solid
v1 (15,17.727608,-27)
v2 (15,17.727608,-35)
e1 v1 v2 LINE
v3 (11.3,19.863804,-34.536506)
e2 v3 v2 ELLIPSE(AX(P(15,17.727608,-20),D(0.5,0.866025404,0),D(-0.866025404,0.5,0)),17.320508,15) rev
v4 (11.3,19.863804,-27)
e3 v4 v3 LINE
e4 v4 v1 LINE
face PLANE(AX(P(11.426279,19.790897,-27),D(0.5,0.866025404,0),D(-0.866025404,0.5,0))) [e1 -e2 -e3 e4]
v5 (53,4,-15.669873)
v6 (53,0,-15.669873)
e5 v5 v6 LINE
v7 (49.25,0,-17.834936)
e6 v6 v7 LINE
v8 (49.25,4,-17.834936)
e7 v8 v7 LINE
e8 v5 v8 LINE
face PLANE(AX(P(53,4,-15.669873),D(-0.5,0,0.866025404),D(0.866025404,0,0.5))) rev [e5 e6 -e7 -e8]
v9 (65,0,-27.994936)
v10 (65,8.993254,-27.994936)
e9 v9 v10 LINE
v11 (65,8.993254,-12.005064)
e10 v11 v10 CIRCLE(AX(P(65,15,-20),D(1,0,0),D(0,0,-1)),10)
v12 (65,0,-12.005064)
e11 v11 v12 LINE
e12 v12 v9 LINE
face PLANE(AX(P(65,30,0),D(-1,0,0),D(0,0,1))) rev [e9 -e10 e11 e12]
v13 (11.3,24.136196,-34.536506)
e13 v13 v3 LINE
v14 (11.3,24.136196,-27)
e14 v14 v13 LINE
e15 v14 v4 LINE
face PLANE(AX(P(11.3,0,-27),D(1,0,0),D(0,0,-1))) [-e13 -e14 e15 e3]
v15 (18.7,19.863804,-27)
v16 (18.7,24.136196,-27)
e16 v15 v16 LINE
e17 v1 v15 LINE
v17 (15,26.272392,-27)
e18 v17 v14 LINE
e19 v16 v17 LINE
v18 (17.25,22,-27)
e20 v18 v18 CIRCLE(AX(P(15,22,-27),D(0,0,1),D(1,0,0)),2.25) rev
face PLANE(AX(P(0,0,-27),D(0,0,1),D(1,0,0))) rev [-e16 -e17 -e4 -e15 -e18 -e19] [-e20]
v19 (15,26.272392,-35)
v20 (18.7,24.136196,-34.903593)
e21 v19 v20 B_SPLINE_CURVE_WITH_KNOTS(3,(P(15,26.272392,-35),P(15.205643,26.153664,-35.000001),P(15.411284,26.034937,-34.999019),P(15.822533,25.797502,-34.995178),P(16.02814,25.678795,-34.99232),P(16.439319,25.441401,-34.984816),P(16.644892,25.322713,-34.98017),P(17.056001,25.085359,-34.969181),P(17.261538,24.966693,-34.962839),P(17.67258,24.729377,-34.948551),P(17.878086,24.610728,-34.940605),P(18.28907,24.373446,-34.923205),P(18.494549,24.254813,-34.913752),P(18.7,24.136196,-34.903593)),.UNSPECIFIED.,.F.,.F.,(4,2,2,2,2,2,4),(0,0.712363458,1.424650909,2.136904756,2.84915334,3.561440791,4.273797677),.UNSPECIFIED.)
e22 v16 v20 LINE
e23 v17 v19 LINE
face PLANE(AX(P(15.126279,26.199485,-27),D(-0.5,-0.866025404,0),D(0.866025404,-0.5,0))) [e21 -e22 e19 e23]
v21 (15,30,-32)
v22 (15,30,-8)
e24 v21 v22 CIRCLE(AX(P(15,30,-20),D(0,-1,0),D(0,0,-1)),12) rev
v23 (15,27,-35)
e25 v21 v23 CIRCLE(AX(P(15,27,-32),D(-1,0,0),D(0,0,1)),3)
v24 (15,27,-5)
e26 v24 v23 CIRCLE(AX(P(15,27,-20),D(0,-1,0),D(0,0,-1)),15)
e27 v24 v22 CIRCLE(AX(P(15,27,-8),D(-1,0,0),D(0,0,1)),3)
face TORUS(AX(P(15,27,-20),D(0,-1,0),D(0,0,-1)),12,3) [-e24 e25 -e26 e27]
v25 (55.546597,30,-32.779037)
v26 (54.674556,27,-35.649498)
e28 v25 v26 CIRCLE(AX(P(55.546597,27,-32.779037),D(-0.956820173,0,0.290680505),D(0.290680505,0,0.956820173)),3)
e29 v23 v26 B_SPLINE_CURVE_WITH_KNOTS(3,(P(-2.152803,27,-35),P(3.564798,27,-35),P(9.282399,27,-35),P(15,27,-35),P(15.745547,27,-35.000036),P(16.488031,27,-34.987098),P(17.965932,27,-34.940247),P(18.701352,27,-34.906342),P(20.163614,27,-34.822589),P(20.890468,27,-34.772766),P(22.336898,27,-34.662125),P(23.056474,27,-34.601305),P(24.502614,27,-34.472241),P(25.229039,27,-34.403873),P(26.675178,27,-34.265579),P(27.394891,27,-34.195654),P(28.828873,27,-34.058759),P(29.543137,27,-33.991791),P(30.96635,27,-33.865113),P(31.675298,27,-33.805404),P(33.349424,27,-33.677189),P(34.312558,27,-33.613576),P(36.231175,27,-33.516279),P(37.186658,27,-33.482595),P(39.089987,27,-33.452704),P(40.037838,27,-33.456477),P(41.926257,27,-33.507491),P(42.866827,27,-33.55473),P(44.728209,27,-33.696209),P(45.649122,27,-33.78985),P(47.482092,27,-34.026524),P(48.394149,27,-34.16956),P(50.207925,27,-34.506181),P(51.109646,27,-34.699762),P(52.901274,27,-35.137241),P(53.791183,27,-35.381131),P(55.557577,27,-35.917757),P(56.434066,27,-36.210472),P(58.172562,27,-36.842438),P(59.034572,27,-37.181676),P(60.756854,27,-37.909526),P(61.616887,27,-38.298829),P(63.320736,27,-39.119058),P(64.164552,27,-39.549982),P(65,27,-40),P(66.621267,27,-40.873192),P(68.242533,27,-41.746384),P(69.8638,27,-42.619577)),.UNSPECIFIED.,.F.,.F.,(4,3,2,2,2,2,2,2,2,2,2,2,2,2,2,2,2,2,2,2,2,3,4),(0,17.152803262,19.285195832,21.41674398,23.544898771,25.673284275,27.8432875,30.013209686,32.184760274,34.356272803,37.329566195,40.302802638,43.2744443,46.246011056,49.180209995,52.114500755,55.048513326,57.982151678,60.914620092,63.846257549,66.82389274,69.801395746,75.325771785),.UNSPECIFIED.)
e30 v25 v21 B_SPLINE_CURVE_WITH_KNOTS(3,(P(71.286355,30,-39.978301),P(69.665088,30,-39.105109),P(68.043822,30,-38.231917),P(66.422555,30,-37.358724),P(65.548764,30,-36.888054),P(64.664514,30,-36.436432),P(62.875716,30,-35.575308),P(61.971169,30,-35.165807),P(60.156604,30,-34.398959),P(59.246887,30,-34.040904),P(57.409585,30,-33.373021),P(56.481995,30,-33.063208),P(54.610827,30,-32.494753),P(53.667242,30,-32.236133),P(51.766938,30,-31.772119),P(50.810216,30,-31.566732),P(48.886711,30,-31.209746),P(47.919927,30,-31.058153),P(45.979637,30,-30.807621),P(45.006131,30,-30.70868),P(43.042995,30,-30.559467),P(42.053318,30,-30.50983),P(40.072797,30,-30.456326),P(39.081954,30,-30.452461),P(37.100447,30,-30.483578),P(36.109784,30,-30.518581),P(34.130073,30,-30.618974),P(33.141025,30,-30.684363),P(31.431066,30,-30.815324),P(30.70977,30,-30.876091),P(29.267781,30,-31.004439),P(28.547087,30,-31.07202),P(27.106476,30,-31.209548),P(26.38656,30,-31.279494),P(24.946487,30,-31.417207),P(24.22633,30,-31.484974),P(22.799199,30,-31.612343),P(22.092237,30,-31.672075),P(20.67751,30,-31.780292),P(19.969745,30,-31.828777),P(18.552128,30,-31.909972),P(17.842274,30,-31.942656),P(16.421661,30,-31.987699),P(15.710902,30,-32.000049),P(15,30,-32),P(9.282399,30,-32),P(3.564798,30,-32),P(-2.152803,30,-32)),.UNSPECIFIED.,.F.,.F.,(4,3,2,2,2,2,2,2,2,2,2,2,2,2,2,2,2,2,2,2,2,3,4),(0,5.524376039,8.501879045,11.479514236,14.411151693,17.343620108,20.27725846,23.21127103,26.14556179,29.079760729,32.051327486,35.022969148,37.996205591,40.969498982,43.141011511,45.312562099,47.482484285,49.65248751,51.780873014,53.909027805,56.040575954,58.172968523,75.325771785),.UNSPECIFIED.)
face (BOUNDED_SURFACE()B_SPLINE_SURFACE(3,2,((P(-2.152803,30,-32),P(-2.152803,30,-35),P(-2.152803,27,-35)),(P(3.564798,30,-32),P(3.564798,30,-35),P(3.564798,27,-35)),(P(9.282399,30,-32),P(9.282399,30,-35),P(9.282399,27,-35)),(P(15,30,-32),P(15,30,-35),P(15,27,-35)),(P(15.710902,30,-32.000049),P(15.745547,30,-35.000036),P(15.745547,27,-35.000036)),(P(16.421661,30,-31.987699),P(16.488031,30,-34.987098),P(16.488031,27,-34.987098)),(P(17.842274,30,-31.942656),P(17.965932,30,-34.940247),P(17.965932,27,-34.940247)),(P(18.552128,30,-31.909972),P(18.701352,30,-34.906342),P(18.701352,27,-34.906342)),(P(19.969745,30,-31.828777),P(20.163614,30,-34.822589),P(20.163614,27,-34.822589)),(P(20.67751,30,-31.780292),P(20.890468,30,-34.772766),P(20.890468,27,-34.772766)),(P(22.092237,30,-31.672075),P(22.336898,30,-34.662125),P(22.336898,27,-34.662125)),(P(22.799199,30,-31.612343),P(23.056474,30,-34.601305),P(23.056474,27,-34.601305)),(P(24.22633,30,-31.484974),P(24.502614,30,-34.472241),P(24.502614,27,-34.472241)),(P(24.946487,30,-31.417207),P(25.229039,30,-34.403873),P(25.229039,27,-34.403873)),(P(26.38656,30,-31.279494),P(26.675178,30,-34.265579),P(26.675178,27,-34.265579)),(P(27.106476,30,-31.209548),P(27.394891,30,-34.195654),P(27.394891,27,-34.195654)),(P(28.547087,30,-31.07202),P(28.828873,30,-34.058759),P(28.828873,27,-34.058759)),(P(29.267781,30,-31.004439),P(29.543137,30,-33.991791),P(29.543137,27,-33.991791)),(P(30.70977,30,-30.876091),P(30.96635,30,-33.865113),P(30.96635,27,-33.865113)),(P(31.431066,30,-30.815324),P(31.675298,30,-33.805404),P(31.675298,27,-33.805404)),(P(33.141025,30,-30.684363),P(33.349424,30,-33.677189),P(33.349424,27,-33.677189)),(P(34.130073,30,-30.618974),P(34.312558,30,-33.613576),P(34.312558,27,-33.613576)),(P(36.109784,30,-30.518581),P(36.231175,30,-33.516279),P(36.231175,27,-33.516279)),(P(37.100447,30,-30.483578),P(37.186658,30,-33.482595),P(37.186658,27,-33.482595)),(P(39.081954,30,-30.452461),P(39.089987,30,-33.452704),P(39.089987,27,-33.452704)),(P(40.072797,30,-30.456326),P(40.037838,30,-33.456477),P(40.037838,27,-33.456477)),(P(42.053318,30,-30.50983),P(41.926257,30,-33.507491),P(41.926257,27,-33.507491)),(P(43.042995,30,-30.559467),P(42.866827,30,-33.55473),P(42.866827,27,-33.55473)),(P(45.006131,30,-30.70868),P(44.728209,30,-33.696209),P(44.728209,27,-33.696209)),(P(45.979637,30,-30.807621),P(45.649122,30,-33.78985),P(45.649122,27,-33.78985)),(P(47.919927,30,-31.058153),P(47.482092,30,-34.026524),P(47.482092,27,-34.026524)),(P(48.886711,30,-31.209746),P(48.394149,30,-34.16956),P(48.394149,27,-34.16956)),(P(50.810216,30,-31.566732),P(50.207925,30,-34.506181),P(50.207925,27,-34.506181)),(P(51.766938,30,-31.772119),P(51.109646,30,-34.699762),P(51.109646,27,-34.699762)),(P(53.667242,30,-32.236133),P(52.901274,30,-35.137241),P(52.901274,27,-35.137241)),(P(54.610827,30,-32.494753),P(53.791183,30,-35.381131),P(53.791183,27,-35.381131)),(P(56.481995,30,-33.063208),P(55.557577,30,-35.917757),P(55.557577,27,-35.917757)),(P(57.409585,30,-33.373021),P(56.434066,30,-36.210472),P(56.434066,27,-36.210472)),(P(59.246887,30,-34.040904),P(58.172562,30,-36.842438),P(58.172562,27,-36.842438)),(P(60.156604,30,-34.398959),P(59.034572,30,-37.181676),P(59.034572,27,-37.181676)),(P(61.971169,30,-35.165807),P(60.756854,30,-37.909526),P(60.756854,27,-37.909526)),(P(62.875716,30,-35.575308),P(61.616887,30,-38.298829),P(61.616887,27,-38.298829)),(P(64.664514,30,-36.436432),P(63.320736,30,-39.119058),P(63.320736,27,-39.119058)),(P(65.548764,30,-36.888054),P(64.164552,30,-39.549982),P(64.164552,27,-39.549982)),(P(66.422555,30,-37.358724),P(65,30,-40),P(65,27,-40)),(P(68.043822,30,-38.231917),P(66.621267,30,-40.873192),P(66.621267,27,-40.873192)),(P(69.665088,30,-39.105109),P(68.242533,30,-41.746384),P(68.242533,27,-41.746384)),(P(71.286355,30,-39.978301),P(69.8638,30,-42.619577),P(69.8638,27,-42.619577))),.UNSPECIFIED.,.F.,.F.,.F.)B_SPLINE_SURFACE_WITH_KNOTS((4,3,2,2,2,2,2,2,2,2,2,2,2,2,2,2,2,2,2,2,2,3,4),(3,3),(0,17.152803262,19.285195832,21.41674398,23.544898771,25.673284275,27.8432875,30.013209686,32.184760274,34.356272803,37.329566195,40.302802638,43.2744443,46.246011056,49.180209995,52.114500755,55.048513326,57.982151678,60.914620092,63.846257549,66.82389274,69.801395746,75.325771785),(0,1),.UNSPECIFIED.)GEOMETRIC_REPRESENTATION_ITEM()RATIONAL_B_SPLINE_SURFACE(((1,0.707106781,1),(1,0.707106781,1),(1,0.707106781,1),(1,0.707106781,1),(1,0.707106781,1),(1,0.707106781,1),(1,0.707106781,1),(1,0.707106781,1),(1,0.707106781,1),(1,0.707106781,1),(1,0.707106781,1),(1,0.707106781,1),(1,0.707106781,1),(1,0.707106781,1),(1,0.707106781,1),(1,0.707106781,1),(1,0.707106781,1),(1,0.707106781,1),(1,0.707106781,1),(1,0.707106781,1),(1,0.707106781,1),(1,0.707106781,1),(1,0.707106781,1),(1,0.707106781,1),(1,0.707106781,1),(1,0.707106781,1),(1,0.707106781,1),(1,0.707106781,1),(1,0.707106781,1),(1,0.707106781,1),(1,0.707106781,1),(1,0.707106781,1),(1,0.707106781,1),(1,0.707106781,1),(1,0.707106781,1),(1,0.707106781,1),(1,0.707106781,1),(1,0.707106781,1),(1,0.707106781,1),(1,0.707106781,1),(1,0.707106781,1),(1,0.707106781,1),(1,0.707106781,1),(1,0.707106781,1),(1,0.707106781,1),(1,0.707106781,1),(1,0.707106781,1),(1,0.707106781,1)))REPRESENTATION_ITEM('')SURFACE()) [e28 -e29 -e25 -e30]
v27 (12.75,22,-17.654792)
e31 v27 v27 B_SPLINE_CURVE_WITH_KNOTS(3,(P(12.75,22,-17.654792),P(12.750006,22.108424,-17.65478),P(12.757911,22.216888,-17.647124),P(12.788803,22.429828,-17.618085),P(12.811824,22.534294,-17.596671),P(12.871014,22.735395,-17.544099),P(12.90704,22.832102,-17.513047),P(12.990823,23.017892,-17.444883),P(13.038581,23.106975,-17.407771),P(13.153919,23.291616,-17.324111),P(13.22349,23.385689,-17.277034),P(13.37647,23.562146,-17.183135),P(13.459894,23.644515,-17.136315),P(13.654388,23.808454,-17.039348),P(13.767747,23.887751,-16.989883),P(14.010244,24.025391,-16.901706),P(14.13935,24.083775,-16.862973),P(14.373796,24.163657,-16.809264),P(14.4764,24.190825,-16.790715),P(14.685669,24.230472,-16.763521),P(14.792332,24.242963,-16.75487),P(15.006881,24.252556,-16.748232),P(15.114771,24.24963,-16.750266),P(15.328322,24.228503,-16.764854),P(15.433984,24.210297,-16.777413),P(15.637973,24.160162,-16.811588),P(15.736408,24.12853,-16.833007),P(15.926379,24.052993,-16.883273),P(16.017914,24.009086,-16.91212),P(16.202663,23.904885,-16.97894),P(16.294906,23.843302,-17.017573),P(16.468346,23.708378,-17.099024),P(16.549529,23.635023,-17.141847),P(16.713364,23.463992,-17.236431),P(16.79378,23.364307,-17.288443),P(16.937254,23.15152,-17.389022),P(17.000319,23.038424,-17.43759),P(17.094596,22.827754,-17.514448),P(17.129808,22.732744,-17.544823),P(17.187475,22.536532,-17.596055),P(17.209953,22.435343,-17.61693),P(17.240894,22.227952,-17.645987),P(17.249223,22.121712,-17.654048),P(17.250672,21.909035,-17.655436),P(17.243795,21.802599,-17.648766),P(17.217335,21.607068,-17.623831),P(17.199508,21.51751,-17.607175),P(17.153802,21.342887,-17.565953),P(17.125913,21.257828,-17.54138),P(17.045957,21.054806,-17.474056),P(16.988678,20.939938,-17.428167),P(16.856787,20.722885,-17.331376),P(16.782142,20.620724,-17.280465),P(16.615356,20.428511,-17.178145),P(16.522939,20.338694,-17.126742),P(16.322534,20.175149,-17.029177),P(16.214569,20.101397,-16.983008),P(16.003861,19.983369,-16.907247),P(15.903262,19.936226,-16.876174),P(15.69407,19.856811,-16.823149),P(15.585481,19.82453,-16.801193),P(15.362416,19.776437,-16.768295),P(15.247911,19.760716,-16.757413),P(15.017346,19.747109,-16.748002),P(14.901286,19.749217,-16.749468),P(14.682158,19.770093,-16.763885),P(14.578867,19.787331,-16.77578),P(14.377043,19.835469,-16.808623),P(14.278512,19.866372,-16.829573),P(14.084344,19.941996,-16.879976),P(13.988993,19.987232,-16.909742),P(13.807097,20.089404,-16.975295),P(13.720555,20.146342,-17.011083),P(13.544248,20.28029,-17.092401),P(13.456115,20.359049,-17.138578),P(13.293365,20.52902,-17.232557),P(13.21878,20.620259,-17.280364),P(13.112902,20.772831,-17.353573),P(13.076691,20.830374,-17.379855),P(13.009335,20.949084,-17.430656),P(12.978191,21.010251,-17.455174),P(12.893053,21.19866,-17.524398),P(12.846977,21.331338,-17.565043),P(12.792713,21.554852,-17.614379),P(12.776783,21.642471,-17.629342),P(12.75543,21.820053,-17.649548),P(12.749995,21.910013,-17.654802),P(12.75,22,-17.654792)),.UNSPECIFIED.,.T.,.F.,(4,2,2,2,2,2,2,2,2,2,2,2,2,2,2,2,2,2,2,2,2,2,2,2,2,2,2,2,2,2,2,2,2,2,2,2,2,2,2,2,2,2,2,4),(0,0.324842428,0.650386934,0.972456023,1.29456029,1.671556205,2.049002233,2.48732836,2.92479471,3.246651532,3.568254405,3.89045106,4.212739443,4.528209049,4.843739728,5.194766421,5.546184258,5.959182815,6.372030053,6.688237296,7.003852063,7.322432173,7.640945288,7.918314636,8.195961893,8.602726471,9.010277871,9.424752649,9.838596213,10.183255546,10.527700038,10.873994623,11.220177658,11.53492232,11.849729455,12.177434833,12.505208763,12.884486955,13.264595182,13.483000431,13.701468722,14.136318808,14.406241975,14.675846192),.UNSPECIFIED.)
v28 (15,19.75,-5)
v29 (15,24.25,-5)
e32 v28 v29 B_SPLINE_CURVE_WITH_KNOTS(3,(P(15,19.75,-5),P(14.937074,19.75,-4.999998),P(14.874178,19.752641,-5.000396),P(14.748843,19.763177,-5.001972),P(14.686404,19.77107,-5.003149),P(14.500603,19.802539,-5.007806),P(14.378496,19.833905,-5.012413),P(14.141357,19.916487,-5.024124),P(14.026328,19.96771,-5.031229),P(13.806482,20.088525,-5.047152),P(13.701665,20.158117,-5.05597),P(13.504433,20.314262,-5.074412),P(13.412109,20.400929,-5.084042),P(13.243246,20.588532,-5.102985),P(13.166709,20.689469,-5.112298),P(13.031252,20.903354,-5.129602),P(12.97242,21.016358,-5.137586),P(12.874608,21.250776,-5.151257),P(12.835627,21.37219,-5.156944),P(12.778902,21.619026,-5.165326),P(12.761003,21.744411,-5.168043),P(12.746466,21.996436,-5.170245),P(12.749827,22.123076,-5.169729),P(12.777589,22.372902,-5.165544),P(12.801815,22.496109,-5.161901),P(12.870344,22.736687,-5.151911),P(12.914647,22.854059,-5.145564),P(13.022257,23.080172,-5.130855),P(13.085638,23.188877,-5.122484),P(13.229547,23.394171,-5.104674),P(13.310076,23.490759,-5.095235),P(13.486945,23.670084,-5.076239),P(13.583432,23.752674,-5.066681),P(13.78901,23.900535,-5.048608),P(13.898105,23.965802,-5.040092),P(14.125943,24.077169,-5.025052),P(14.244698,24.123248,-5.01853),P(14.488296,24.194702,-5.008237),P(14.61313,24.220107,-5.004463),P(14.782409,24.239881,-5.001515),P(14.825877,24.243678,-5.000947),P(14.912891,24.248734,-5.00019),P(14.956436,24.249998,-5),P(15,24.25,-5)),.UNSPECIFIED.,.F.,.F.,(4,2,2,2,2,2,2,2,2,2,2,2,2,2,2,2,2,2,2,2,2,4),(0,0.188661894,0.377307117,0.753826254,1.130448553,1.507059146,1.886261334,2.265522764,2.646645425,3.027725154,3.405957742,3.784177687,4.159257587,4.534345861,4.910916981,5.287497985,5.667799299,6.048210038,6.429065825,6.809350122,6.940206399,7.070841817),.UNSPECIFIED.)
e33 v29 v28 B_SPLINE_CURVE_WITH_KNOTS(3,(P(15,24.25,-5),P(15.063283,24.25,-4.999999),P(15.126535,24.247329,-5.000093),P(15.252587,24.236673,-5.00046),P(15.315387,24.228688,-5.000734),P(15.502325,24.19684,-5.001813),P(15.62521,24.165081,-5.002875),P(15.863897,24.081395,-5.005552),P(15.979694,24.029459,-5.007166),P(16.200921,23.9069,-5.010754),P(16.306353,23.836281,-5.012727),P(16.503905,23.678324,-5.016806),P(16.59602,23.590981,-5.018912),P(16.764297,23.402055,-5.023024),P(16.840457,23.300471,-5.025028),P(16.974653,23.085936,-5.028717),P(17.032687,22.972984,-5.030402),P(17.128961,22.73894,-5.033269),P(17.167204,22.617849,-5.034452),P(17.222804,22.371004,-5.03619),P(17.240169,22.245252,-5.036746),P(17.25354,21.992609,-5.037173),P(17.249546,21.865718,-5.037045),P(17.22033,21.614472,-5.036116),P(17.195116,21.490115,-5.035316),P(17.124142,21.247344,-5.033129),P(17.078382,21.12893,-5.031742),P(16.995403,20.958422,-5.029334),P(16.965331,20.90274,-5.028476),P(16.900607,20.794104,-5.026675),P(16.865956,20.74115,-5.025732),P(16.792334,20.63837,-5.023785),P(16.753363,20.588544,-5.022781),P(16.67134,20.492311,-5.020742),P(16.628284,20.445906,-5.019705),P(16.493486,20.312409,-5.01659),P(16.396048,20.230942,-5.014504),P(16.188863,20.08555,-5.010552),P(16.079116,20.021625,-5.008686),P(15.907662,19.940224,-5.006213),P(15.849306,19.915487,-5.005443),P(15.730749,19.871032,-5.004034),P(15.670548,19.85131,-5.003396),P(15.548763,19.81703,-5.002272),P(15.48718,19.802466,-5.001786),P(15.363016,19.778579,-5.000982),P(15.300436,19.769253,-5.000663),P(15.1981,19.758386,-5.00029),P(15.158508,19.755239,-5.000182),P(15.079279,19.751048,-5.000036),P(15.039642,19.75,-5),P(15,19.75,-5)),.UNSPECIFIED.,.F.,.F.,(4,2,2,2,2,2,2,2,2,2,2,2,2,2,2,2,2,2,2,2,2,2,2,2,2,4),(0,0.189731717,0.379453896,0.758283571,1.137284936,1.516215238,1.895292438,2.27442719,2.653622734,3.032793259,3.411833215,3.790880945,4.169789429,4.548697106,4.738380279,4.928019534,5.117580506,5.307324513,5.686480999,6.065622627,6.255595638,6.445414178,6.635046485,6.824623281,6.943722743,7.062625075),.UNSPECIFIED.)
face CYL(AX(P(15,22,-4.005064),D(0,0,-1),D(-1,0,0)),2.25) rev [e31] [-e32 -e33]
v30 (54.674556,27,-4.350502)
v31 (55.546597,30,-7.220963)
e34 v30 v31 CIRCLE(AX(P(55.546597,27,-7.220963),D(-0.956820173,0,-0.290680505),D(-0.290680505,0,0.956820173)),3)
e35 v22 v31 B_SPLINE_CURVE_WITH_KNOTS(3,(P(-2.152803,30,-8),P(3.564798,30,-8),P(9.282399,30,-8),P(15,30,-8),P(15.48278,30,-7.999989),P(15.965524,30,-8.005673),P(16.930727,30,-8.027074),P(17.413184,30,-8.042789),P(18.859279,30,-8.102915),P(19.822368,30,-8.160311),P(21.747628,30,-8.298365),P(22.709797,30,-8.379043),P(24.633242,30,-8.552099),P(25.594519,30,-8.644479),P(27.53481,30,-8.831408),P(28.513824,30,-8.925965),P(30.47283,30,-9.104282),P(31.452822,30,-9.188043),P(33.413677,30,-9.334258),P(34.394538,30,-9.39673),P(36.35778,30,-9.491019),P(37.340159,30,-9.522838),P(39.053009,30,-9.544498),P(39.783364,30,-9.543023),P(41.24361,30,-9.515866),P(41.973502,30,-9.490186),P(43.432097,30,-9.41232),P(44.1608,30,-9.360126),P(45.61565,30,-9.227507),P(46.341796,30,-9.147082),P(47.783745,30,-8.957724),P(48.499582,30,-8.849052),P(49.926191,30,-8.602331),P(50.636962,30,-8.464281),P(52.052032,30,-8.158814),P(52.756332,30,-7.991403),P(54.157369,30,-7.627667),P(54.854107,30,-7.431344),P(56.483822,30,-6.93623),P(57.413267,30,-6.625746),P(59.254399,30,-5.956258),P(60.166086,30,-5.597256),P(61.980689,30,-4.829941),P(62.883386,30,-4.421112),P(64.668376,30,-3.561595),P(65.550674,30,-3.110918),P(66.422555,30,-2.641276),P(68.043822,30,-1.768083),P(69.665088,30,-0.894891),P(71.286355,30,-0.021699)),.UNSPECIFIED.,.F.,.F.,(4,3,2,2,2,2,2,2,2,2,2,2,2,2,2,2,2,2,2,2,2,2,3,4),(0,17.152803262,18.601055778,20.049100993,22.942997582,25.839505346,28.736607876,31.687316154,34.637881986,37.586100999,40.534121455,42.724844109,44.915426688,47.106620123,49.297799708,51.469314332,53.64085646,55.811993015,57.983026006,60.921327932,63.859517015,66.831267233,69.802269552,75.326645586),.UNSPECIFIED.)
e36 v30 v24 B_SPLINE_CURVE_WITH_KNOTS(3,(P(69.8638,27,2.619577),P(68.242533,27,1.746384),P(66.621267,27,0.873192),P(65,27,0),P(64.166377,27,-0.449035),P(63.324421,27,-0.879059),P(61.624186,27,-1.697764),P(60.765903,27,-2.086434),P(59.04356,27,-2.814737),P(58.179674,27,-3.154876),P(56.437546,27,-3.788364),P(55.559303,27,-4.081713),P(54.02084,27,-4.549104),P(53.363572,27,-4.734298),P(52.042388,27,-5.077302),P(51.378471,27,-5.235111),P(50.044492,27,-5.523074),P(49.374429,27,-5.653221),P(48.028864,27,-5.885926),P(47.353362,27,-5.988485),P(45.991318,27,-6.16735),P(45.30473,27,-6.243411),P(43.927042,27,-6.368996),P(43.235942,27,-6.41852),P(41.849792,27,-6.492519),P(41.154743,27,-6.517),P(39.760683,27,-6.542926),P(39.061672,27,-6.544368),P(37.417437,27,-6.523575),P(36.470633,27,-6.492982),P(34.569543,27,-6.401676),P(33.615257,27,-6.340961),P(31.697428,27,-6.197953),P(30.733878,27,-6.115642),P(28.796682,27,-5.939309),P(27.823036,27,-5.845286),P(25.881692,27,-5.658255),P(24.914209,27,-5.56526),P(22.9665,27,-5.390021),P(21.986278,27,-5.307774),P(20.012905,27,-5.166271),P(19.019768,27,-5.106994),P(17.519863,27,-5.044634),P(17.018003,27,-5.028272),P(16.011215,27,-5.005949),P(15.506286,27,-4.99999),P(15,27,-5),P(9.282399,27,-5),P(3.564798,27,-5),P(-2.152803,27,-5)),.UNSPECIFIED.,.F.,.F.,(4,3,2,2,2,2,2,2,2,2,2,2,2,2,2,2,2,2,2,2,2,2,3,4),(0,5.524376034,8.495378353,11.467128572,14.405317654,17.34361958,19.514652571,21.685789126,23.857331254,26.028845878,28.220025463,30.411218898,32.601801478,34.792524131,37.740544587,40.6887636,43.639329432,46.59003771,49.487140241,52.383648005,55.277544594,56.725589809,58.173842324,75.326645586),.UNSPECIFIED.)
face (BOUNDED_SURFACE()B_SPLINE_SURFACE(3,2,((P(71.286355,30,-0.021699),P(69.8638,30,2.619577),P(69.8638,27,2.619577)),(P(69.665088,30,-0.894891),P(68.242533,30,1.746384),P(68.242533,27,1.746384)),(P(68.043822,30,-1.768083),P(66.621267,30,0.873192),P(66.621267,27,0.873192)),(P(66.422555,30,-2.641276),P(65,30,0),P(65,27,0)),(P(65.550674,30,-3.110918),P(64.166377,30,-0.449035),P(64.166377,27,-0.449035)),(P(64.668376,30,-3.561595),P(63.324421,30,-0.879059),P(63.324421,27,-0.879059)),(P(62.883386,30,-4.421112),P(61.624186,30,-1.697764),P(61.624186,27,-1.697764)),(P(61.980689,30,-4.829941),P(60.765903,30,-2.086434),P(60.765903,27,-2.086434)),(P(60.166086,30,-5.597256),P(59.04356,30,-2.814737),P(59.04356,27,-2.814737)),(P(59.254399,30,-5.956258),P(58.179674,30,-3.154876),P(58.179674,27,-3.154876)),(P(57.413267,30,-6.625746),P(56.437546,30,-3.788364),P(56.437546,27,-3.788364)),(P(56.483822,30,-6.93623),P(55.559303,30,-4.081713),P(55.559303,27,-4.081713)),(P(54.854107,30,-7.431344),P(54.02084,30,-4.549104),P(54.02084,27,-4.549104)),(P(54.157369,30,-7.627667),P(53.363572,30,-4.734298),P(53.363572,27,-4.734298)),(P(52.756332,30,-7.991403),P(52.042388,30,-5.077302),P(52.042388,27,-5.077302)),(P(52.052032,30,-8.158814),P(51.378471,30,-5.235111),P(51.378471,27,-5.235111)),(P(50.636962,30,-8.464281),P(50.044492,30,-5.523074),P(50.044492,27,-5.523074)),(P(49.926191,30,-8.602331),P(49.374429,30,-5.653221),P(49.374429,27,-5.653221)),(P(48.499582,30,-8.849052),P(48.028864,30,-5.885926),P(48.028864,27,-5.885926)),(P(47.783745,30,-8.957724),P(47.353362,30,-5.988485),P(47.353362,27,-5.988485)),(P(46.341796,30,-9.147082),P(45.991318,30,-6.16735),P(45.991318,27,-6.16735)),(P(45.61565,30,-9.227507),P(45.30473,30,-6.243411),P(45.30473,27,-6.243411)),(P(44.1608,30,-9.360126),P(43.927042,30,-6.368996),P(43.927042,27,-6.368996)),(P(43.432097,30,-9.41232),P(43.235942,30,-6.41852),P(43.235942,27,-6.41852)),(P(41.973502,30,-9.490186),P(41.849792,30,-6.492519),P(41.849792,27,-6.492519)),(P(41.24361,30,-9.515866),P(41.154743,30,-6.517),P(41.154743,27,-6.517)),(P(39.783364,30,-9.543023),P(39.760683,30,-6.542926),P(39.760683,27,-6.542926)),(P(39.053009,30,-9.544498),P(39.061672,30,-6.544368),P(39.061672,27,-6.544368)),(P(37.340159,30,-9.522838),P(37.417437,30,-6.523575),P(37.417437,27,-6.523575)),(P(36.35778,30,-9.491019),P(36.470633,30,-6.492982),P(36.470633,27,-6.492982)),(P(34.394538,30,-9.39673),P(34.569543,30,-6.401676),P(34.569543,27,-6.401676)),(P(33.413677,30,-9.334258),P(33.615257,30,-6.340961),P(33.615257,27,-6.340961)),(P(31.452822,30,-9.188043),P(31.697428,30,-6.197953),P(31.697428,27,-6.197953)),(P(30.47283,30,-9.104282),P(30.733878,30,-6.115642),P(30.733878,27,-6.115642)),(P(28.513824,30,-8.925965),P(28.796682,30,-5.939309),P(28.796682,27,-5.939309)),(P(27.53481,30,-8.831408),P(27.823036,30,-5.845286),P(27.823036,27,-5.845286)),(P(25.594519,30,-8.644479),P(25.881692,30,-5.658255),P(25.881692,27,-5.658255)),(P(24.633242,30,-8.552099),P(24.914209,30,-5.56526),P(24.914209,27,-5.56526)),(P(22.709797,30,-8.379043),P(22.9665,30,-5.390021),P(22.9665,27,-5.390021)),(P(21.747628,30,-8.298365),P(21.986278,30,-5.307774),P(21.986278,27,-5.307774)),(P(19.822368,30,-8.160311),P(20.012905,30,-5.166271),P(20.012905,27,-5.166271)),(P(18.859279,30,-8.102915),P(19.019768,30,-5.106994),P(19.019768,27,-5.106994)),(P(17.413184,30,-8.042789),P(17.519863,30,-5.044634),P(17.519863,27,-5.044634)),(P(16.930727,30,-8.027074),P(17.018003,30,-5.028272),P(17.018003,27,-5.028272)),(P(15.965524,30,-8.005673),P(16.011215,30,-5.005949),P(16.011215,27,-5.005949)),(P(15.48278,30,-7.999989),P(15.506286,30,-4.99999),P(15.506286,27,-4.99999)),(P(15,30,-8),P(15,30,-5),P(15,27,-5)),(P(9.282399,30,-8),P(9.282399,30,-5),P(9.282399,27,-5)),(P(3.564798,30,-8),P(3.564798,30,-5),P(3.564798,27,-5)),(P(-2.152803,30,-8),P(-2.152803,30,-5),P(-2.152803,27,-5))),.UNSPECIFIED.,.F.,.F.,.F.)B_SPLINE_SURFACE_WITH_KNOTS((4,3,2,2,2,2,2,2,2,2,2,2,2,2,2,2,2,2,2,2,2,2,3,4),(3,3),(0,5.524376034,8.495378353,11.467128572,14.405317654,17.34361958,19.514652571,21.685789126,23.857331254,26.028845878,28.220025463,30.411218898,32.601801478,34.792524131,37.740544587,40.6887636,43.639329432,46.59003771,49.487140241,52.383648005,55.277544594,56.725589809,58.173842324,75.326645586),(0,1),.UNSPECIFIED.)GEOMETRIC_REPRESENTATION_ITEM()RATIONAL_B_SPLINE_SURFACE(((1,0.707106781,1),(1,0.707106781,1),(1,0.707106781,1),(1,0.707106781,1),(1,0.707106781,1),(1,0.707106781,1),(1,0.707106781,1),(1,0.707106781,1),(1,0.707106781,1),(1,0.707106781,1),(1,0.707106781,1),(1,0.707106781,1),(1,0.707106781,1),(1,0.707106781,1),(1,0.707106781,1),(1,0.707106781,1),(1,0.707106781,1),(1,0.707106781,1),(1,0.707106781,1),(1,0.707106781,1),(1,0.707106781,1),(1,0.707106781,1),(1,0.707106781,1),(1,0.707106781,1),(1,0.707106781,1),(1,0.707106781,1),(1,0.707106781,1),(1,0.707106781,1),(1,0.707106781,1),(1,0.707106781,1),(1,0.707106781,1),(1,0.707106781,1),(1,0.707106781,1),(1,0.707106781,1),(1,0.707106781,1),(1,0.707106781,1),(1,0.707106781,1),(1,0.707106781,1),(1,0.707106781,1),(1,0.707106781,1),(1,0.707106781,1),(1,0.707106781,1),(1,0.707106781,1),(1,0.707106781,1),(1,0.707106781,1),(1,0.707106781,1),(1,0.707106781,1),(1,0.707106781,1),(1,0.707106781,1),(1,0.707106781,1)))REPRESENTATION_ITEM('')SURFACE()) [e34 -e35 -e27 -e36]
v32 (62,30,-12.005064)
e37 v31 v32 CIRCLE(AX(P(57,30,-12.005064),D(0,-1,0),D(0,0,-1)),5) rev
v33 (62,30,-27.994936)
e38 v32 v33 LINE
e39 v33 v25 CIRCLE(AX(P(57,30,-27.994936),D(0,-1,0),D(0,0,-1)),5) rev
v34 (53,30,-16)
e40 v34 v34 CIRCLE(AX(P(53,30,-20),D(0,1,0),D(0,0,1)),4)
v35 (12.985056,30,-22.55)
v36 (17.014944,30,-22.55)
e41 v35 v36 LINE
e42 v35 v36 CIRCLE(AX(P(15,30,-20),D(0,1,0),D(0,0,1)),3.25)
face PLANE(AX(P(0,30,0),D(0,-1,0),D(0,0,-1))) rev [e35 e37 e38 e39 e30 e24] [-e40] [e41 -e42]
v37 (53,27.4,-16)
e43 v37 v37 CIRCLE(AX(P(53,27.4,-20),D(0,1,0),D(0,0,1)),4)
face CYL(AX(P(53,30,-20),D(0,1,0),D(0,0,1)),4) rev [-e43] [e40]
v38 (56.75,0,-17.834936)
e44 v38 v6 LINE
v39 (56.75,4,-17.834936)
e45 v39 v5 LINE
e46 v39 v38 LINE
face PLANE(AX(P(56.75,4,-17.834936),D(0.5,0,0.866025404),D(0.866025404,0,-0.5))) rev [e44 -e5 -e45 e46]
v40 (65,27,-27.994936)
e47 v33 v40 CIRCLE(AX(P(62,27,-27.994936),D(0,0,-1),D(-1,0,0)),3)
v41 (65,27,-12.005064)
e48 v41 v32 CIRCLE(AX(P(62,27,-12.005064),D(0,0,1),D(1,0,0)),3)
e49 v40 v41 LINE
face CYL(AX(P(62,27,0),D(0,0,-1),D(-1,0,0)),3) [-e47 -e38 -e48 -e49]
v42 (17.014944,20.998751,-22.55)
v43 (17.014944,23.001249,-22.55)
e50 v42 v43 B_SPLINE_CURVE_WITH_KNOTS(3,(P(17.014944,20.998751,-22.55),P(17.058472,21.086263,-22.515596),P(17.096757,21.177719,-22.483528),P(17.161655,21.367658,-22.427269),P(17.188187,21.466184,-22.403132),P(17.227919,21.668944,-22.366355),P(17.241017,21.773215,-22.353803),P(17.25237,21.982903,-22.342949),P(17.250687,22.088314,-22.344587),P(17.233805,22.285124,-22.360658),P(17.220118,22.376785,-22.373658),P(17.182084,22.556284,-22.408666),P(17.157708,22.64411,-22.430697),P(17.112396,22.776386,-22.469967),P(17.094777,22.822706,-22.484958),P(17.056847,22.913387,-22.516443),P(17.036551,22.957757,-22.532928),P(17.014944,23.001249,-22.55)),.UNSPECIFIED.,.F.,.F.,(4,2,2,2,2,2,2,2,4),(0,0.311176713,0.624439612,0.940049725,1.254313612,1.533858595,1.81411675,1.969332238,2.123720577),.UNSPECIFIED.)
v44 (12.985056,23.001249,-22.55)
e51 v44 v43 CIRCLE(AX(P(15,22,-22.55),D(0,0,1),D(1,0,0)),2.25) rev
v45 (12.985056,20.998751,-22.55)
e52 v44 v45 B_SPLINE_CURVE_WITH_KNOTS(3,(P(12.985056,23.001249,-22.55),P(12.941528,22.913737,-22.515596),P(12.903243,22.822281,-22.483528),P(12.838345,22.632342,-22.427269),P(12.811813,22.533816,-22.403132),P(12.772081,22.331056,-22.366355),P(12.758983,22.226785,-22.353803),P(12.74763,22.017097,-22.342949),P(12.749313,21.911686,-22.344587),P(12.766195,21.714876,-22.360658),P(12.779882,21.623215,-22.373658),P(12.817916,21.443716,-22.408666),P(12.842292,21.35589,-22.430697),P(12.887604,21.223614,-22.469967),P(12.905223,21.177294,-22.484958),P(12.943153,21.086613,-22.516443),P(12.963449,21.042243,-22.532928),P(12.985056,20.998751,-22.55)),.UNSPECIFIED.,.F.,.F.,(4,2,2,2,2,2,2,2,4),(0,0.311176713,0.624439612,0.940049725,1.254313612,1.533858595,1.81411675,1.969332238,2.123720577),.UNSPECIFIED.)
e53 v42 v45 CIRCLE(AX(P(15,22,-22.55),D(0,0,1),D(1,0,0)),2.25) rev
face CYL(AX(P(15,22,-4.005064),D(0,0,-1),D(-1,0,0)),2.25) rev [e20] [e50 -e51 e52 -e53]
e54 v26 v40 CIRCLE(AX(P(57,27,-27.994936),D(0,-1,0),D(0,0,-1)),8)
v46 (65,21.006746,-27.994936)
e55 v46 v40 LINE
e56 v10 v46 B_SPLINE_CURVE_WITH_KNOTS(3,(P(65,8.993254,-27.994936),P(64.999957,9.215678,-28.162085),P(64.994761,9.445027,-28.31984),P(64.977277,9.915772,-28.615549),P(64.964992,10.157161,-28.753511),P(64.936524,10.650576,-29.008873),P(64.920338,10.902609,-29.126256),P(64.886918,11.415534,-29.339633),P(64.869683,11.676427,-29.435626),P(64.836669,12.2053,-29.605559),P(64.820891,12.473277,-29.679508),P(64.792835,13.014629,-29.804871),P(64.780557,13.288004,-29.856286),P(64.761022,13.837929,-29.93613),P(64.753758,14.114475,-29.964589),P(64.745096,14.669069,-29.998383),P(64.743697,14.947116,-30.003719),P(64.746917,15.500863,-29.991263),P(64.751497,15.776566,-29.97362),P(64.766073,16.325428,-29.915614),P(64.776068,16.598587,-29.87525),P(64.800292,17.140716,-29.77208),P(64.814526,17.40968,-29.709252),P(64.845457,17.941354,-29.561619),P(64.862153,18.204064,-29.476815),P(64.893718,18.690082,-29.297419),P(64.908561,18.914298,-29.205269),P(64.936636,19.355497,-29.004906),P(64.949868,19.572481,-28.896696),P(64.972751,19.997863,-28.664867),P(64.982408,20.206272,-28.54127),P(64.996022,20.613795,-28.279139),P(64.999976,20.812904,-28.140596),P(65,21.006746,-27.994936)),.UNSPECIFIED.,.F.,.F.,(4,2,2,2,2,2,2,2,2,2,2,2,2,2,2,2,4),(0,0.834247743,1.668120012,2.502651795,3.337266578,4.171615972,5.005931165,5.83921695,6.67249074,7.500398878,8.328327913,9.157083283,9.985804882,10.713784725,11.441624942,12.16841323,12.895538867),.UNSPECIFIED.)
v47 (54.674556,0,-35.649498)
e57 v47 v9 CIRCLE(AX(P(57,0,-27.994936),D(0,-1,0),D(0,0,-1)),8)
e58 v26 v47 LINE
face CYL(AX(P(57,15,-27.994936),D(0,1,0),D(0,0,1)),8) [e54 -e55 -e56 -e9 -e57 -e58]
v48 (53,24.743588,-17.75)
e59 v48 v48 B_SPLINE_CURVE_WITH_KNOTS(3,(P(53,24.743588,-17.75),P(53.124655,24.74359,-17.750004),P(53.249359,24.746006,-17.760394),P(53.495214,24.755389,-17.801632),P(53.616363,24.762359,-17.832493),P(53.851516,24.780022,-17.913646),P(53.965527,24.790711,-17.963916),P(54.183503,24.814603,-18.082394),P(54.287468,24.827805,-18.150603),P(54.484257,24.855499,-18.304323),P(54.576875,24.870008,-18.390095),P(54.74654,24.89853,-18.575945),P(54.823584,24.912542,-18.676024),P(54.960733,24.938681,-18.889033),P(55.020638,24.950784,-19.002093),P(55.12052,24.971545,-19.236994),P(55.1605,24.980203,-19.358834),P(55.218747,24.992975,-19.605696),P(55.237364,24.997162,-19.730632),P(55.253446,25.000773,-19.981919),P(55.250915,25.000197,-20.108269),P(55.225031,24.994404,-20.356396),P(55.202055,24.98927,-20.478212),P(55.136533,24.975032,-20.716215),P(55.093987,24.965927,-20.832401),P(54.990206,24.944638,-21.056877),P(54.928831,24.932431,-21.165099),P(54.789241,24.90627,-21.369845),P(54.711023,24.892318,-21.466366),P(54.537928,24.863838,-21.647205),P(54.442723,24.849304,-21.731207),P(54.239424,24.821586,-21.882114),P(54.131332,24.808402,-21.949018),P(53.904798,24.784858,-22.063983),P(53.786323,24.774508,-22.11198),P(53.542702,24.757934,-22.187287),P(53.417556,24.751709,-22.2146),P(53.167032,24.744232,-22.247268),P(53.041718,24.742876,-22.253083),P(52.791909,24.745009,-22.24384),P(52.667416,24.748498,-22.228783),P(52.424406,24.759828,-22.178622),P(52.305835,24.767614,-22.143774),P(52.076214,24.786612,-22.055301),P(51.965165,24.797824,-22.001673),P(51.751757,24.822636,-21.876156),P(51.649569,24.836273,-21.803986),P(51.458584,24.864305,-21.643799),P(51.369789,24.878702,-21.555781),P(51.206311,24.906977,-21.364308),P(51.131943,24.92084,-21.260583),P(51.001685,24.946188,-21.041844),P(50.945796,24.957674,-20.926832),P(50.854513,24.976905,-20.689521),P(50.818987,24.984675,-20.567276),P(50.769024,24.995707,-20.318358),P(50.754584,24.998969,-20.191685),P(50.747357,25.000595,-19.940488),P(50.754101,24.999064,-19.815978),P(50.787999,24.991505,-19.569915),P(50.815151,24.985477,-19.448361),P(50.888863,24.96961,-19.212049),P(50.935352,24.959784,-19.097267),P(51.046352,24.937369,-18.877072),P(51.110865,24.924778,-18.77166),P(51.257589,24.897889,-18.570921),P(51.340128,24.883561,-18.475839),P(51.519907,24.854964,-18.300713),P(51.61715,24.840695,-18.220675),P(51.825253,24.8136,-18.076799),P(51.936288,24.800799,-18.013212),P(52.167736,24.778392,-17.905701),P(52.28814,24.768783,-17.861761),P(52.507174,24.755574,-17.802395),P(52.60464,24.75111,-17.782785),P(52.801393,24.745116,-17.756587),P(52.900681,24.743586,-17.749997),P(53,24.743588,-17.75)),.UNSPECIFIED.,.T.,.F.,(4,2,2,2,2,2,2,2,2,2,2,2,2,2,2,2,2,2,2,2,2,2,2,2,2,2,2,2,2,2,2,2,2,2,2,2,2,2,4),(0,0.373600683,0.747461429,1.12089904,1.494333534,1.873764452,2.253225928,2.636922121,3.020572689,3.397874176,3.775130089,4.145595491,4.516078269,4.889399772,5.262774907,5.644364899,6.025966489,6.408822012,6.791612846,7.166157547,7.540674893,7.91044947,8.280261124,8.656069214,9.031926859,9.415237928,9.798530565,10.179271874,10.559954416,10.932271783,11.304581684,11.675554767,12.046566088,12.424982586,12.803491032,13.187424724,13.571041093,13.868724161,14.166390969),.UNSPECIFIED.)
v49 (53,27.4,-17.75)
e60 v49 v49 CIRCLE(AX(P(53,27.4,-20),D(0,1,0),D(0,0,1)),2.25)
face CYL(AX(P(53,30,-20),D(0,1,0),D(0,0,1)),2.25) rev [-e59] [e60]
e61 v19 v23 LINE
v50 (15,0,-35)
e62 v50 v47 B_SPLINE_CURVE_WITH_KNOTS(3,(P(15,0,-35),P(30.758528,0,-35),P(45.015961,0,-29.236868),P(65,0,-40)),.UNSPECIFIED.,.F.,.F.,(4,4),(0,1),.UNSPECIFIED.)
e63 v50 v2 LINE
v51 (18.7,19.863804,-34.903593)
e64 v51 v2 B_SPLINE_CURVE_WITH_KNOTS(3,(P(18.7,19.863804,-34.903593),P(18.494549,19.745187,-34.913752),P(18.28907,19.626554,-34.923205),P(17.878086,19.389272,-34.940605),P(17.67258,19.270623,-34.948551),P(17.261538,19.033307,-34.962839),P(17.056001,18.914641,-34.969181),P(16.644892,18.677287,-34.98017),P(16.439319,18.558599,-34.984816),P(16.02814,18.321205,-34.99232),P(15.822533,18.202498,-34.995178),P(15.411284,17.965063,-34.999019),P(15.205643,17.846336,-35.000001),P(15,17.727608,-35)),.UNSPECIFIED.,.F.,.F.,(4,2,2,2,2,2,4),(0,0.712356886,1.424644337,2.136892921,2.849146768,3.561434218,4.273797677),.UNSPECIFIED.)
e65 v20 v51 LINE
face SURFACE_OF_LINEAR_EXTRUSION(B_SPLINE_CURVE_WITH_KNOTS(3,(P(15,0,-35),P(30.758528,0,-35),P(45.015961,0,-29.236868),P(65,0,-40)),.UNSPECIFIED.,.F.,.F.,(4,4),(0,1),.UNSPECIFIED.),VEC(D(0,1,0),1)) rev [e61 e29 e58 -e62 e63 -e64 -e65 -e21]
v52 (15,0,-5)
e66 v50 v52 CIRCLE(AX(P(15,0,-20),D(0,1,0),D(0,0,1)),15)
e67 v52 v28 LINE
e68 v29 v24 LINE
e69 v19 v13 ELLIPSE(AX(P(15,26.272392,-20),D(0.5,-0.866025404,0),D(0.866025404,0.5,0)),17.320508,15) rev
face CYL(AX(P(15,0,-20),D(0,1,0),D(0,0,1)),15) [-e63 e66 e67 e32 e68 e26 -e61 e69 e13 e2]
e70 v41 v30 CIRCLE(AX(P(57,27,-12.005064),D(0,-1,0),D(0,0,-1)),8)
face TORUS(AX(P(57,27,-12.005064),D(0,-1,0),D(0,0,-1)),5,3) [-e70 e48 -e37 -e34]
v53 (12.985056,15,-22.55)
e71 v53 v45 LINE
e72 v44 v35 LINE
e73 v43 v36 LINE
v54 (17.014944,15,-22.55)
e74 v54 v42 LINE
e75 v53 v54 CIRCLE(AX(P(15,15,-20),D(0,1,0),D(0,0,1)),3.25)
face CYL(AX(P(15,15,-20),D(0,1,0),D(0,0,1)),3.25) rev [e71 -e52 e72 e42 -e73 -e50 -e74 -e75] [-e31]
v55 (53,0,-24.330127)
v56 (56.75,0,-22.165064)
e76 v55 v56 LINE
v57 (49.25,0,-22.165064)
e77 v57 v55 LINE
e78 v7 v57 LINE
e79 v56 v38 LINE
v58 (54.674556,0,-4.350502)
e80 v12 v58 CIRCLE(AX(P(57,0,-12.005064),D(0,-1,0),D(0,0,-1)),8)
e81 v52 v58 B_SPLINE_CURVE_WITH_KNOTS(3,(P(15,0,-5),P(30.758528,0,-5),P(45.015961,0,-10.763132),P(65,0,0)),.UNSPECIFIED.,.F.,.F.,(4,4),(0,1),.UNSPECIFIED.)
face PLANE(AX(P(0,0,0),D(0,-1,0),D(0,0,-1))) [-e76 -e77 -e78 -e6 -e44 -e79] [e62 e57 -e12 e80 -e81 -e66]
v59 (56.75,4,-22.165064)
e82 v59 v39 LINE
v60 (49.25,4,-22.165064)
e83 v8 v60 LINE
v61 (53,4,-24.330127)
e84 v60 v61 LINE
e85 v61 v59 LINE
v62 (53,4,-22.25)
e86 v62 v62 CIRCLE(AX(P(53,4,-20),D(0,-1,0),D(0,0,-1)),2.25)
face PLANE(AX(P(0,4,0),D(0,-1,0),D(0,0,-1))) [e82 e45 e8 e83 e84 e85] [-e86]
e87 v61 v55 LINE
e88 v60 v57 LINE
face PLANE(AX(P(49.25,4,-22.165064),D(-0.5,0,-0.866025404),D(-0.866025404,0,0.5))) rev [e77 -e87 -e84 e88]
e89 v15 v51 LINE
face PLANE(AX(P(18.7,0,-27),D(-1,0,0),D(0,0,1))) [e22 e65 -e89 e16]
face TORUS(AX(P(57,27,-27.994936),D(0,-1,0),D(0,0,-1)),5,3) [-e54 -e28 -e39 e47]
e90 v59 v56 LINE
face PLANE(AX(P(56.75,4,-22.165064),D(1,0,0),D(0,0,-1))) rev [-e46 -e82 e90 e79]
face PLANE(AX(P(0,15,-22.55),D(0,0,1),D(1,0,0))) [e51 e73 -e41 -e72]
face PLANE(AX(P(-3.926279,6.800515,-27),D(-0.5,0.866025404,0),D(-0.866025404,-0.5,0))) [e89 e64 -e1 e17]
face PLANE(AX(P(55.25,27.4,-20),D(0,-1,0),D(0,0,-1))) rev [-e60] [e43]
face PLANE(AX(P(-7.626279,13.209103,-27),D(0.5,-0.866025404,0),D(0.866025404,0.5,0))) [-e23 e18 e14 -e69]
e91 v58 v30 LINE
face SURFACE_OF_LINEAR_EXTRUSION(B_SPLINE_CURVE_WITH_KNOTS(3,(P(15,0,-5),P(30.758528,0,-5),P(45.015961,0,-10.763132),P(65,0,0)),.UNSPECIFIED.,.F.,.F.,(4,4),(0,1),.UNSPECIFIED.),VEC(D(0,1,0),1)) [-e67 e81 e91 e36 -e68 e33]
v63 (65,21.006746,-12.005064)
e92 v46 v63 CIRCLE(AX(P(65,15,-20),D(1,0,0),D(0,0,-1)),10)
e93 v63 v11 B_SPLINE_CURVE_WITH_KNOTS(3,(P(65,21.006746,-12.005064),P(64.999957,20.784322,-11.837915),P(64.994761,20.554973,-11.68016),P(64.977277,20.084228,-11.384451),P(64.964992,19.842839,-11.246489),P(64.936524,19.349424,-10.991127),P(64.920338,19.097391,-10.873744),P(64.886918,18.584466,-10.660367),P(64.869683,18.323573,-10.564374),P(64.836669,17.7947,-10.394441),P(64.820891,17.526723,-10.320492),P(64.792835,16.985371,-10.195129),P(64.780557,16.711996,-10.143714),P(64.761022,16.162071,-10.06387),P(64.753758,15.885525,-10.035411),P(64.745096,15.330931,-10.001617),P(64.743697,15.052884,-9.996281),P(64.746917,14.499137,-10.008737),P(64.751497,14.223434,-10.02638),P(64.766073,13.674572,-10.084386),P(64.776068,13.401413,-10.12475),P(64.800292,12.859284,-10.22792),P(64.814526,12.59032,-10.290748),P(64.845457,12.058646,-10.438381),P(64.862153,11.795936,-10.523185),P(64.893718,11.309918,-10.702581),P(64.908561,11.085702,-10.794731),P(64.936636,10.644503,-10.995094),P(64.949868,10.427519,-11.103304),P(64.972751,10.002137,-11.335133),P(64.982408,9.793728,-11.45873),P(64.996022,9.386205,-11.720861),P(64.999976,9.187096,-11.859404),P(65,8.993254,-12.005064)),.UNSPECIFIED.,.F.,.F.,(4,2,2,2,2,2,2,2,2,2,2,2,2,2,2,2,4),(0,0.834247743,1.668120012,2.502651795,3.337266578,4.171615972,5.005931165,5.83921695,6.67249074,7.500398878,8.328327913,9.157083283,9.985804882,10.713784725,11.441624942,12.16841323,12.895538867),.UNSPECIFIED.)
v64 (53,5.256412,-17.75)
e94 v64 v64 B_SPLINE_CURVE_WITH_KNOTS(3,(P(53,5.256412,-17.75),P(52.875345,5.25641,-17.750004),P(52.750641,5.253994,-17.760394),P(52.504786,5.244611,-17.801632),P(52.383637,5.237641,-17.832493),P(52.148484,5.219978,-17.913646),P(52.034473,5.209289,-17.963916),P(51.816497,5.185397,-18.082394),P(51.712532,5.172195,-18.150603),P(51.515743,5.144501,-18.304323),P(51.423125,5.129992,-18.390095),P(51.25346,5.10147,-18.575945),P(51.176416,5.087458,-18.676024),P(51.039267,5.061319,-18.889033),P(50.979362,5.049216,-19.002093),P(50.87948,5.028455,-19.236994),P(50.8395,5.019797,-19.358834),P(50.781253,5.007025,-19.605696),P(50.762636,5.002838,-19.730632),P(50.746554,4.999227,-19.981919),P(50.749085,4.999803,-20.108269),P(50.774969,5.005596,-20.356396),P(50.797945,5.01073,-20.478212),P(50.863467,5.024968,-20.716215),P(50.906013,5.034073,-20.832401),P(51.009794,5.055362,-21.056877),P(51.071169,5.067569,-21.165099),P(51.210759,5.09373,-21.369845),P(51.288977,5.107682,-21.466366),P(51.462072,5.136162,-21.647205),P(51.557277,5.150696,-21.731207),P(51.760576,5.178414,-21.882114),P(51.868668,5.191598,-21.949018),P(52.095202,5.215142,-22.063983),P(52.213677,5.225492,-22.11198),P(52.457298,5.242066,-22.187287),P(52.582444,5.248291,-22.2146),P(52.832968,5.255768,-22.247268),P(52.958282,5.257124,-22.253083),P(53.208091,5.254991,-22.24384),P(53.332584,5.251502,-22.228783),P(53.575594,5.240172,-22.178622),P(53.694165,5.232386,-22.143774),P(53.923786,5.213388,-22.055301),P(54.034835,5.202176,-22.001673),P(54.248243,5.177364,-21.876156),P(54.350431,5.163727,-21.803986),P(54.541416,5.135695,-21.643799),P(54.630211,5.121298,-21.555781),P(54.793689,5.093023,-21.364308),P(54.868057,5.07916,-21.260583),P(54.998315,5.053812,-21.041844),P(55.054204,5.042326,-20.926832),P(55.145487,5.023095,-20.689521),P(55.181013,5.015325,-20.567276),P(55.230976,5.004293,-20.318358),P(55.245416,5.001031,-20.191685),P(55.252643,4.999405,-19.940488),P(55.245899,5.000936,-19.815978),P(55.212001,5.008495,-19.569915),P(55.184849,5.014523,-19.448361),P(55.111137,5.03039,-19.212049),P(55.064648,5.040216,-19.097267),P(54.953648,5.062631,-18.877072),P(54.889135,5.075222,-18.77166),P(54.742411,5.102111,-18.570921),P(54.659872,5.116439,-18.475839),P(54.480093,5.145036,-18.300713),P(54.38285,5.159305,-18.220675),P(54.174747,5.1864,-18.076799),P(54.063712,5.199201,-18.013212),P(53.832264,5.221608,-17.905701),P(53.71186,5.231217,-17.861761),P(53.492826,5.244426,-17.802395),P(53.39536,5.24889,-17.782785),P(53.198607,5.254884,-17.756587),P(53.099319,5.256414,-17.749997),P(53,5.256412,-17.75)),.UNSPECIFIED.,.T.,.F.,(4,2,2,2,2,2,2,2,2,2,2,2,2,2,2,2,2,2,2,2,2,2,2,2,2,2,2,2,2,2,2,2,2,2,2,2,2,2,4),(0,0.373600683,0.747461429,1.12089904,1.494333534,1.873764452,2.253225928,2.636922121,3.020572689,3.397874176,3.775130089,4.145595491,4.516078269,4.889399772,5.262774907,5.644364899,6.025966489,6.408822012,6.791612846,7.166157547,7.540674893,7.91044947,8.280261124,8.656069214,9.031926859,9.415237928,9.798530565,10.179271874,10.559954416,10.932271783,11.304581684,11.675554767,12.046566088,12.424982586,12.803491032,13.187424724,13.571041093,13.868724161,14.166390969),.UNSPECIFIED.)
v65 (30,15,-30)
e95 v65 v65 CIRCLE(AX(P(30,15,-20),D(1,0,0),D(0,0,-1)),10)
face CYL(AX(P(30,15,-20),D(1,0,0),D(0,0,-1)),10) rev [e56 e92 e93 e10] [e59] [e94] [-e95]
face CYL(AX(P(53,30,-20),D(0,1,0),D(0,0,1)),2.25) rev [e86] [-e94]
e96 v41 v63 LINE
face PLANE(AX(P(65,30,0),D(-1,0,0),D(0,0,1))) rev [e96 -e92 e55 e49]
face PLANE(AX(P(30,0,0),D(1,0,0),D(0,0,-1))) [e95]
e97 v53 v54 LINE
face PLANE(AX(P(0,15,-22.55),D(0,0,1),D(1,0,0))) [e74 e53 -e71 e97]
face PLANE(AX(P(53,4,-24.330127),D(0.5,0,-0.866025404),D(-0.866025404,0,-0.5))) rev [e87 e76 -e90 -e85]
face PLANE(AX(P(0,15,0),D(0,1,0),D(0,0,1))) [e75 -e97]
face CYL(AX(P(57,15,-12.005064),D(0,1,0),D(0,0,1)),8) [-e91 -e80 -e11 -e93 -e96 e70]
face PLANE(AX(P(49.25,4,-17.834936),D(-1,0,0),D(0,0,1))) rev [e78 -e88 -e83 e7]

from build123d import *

# Parameters (mm, degrees)
SKETCH1_W                                   = 65
SKETCH1_H                                   = 40
BOSS_EXTRUDE1_DEPTH                         = 30
SKETCH3_R                                   = 10
CUT_EXTRUDE2_DEPTH                          = 35
CBORE_FOR_M4_CHEESE_HEAD_SCREW1_D           = 4.5
CBORE_FOR_M4_CHEESE_HEAD_SCREW1_CBORE_D     = 8
CBORE_FOR_M4_CHEESE_HEAD_SCREW1_CBORE_DEPTH = 2.6
SKETCH10_R                                  = 2.25
CUT_EXTRUDE8_DEPTH                          = 4
CUT_EXTRUDE9_DEPTH                          = 15
CUT_EXTRUDE10_DEPTH                         = 83.006097414
FILLET9_R                                   = 8
SKETCH12_R                                  = 2.25
CUT_EXTRUDE11_DEPTH                         = 8
SKETCH12_3_R                                = 2.25
CUT_EXTRUDE12_DEPTH                         = 79.010807554
FILLET10_R                                  = 3


with BuildPart() as part:
    # Sketch1 → Boss-Extrude1 (new body)
    with BuildSketch(Plane(origin=(0, 0, 0), x_dir=(1, 0, 0), z_dir=(0, 1, 0))):
        with Locations((32.5, 20)):
            Rectangle(SKETCH1_W, SKETCH1_H)
    extrude(amount=BOSS_EXTRUDE1_DEPTH)

    # Sketch3 → Cut-Extrude2 (cut)
    with BuildSketch(Plane(origin=(65, 0, 0), x_dir=(0, 0, -1), z_dir=(1, 0, 0))):
        with Locations((20, 15)):
            Circle(SKETCH3_R)
    extrude(amount=-CUT_EXTRUDE2_DEPTH, mode=Mode.SUBTRACT)

    # CBORE for M4 Cheese Head Screw1 (through all)
    with Locations(Plane(origin=(0, 30, 0), x_dir=(1, 0, 0), z_dir=(0, 1, 0))):
        with Locations((53, 20)):
            CounterBoreHole(CBORE_FOR_M4_CHEESE_HEAD_SCREW1_D / 2, CBORE_FOR_M4_CHEESE_HEAD_SCREW1_CBORE_D / 2, CBORE_FOR_M4_CHEESE_HEAD_SCREW1_CBORE_DEPTH)

    # Sketch10 → Cut-Extrude8 (cut)
    with BuildSketch(Plane.XZ):
        Polygon((53, -15.669872981), (49.25, -17.834936491), (49.25, -22.165063509), (53, -24.330127019), (56.75, -22.165063509), (56.75, -17.834936491), align=None)
        with Locations(Location((53, -20, 0), (0, 0, 90))):
            Circle(SKETCH10_R, mode=Mode.SUBTRACT)
    extrude(amount=-CUT_EXTRUDE8_DEPTH, mode=Mode.SUBTRACT)

    # Sketch2 → Cut-Extrude9 (cut)
    with BuildSketch(Plane(origin=(0, 30, 0), x_dir=(1, 0, 0), z_dir=(0, 1, 0))):
        with BuildLine():
            Line((17.014944168, 22.55), (12.985055832, 22.55))
            ThreePointArc((12.985055832, 22.55), (13.583325822, 17.075015509), (18.25, 20))
            ThreePointArc((18.25, 20), (17.924984491, 21.416674178), (17.014944168, 22.55))
        make_face()
    extrude(amount=-CUT_EXTRUDE9_DEPTH, mode=Mode.SUBTRACT)

    # Sketch2<7> → Cut-Extrude10 (cut, through all)
    with BuildSketch(Plane(origin=(0, 30, 0), x_dir=(1, 0, 0), z_dir=(0, 1, 0))):
        with BuildLine():
            Line((65, 40), (0, 40))
            Line((0, 40), (0, 19.999999921))
            ThreePointArc((0, 19.999999921), (4.393398254, 30.60660169), (15, 35))
            add(Edge.make_bspline(
                [(15, 35), (30.758528256, 35), (45.015961289, 29.236867717), (65, 40)],
                knots=[0, 0, 0, 0, 1, 1, 1, 1], degree=3))
        make_face()
        with BuildLine():
            ThreePointArc((15, 5), (4.39339831, 9.393398254), (0, 19.999999921))
            Line((0, 19.999999921), (0, 0))
            Line((0, 0), (65, 0))
            add(Edge.make_bspline(
                [(15, 5), (30.758528256, 5), (45.015961289, 10.763132283), (65, 0)],
                knots=[0, 0, 0, 0, 1, 1, 1, 1], degree=3))
        make_face()
    extrude(amount=-CUT_EXTRUDE10_DEPTH, mode=Mode.SUBTRACT)

    # Fillet9
    # the kernel refuses this fillet: 8 mm, written as the material it takes off along each edge
    with BuildSketch(Plane(origin=(65, 0, -40), x_dir=(0, 0, 1), z_dir=(0, 1, 0))) as fillet9_piece_1:
        with BuildLine():
            CenterArc((12.0050638, -8), FILLET9_R, 90, 106.898701243)
            Line((4.350502414, -10.325444039), (4.197411186, -10.37195292))
            ThreePointArc((4.197411186, -10.37195292), (2.285588644, -5.115947892), (-0.140868031, -0.075869611))
            Line((-0.140868031, -0.075869611), (0, 0.16))
            Line((0, 0.16), (12.0050638, 0.16))
            Line((12.0050638, 0.16), (12.0050638, 0))
        make_face()
    extrude(amount=30, mode=Mode.SUBTRACT)
    with BuildSketch(Plane(origin=(65, 0, 0), x_dir=(0, 0, -1), z_dir=(0, 1, 0))) as fillet9_piece_2:
        with BuildLine():
            CenterArc((12.0050638, 8), FILLET9_R, 163.101298757, 106.898701243)
            Line((4.350502414, 10.325444039), (4.197411186, 10.37195292))
            ThreePointArc((4.197411186, 10.37195292), (2.285588644, 5.115947892), (-0.140868031, 0.075869611))
            Line((-0.140868031, 0.075869611), (0, -0.16))
            Line((0, -0.16), (12.0050638, -0.16))
            Line((12.0050638, -0.16), (12.0050638, 0))
        make_face()
    extrude(amount=30, mode=Mode.SUBTRACT)

    # Sketch12 → Cut-Extrude11 (cut)
    # profile 1 of 2: a face of its own
    with BuildSketch(Plane.XY.offset(-35)):
        Polygon((15, 17.727608008), (18.7, 19.863804004), (18.7, 24.136195996), (15, 26.272391992), (11.3, 24.136195996), (11.3, 19.863804004), align=None)
        with Locations((15, 22)):
            Circle(SKETCH12_R, mode=Mode.SUBTRACT)
    # profile 2 of 2: a face of its own
    with BuildSketch(Plane.XY.offset(-35)):
        with Locations((15, 22)):
            Circle(SKETCH12_R)
    extrude(amount=CUT_EXTRUDE11_DEPTH, mode=Mode.SUBTRACT)

    # Sketch12<3> → Cut-Extrude12 (cut, through all)
    with BuildSketch(Plane.XY.offset(-35)):
        with Locations(Location((15, 22, 0), (0, 0, 153.576683422))):
            Circle(SKETCH12_3_R)
    extrude(amount=CUT_EXTRUDE12_DEPTH, mode=Mode.SUBTRACT)

    # Fillet10
    fillet10_edges = [part.edges().sort_by_distance(p)[0] for p in [
        (0, 30, -20),
        (34.916790613, 30, -33.583596944),
        (34.916790613, 30, -6.416403056),
        (65, 30, -20),
        (61.7642653, 30, -34.421581993),
        (61.7642653, 30, -5.578418007),
    ]]
    fillet(fillet10_edges, radius=FILLET10_R)


solid = part.part
